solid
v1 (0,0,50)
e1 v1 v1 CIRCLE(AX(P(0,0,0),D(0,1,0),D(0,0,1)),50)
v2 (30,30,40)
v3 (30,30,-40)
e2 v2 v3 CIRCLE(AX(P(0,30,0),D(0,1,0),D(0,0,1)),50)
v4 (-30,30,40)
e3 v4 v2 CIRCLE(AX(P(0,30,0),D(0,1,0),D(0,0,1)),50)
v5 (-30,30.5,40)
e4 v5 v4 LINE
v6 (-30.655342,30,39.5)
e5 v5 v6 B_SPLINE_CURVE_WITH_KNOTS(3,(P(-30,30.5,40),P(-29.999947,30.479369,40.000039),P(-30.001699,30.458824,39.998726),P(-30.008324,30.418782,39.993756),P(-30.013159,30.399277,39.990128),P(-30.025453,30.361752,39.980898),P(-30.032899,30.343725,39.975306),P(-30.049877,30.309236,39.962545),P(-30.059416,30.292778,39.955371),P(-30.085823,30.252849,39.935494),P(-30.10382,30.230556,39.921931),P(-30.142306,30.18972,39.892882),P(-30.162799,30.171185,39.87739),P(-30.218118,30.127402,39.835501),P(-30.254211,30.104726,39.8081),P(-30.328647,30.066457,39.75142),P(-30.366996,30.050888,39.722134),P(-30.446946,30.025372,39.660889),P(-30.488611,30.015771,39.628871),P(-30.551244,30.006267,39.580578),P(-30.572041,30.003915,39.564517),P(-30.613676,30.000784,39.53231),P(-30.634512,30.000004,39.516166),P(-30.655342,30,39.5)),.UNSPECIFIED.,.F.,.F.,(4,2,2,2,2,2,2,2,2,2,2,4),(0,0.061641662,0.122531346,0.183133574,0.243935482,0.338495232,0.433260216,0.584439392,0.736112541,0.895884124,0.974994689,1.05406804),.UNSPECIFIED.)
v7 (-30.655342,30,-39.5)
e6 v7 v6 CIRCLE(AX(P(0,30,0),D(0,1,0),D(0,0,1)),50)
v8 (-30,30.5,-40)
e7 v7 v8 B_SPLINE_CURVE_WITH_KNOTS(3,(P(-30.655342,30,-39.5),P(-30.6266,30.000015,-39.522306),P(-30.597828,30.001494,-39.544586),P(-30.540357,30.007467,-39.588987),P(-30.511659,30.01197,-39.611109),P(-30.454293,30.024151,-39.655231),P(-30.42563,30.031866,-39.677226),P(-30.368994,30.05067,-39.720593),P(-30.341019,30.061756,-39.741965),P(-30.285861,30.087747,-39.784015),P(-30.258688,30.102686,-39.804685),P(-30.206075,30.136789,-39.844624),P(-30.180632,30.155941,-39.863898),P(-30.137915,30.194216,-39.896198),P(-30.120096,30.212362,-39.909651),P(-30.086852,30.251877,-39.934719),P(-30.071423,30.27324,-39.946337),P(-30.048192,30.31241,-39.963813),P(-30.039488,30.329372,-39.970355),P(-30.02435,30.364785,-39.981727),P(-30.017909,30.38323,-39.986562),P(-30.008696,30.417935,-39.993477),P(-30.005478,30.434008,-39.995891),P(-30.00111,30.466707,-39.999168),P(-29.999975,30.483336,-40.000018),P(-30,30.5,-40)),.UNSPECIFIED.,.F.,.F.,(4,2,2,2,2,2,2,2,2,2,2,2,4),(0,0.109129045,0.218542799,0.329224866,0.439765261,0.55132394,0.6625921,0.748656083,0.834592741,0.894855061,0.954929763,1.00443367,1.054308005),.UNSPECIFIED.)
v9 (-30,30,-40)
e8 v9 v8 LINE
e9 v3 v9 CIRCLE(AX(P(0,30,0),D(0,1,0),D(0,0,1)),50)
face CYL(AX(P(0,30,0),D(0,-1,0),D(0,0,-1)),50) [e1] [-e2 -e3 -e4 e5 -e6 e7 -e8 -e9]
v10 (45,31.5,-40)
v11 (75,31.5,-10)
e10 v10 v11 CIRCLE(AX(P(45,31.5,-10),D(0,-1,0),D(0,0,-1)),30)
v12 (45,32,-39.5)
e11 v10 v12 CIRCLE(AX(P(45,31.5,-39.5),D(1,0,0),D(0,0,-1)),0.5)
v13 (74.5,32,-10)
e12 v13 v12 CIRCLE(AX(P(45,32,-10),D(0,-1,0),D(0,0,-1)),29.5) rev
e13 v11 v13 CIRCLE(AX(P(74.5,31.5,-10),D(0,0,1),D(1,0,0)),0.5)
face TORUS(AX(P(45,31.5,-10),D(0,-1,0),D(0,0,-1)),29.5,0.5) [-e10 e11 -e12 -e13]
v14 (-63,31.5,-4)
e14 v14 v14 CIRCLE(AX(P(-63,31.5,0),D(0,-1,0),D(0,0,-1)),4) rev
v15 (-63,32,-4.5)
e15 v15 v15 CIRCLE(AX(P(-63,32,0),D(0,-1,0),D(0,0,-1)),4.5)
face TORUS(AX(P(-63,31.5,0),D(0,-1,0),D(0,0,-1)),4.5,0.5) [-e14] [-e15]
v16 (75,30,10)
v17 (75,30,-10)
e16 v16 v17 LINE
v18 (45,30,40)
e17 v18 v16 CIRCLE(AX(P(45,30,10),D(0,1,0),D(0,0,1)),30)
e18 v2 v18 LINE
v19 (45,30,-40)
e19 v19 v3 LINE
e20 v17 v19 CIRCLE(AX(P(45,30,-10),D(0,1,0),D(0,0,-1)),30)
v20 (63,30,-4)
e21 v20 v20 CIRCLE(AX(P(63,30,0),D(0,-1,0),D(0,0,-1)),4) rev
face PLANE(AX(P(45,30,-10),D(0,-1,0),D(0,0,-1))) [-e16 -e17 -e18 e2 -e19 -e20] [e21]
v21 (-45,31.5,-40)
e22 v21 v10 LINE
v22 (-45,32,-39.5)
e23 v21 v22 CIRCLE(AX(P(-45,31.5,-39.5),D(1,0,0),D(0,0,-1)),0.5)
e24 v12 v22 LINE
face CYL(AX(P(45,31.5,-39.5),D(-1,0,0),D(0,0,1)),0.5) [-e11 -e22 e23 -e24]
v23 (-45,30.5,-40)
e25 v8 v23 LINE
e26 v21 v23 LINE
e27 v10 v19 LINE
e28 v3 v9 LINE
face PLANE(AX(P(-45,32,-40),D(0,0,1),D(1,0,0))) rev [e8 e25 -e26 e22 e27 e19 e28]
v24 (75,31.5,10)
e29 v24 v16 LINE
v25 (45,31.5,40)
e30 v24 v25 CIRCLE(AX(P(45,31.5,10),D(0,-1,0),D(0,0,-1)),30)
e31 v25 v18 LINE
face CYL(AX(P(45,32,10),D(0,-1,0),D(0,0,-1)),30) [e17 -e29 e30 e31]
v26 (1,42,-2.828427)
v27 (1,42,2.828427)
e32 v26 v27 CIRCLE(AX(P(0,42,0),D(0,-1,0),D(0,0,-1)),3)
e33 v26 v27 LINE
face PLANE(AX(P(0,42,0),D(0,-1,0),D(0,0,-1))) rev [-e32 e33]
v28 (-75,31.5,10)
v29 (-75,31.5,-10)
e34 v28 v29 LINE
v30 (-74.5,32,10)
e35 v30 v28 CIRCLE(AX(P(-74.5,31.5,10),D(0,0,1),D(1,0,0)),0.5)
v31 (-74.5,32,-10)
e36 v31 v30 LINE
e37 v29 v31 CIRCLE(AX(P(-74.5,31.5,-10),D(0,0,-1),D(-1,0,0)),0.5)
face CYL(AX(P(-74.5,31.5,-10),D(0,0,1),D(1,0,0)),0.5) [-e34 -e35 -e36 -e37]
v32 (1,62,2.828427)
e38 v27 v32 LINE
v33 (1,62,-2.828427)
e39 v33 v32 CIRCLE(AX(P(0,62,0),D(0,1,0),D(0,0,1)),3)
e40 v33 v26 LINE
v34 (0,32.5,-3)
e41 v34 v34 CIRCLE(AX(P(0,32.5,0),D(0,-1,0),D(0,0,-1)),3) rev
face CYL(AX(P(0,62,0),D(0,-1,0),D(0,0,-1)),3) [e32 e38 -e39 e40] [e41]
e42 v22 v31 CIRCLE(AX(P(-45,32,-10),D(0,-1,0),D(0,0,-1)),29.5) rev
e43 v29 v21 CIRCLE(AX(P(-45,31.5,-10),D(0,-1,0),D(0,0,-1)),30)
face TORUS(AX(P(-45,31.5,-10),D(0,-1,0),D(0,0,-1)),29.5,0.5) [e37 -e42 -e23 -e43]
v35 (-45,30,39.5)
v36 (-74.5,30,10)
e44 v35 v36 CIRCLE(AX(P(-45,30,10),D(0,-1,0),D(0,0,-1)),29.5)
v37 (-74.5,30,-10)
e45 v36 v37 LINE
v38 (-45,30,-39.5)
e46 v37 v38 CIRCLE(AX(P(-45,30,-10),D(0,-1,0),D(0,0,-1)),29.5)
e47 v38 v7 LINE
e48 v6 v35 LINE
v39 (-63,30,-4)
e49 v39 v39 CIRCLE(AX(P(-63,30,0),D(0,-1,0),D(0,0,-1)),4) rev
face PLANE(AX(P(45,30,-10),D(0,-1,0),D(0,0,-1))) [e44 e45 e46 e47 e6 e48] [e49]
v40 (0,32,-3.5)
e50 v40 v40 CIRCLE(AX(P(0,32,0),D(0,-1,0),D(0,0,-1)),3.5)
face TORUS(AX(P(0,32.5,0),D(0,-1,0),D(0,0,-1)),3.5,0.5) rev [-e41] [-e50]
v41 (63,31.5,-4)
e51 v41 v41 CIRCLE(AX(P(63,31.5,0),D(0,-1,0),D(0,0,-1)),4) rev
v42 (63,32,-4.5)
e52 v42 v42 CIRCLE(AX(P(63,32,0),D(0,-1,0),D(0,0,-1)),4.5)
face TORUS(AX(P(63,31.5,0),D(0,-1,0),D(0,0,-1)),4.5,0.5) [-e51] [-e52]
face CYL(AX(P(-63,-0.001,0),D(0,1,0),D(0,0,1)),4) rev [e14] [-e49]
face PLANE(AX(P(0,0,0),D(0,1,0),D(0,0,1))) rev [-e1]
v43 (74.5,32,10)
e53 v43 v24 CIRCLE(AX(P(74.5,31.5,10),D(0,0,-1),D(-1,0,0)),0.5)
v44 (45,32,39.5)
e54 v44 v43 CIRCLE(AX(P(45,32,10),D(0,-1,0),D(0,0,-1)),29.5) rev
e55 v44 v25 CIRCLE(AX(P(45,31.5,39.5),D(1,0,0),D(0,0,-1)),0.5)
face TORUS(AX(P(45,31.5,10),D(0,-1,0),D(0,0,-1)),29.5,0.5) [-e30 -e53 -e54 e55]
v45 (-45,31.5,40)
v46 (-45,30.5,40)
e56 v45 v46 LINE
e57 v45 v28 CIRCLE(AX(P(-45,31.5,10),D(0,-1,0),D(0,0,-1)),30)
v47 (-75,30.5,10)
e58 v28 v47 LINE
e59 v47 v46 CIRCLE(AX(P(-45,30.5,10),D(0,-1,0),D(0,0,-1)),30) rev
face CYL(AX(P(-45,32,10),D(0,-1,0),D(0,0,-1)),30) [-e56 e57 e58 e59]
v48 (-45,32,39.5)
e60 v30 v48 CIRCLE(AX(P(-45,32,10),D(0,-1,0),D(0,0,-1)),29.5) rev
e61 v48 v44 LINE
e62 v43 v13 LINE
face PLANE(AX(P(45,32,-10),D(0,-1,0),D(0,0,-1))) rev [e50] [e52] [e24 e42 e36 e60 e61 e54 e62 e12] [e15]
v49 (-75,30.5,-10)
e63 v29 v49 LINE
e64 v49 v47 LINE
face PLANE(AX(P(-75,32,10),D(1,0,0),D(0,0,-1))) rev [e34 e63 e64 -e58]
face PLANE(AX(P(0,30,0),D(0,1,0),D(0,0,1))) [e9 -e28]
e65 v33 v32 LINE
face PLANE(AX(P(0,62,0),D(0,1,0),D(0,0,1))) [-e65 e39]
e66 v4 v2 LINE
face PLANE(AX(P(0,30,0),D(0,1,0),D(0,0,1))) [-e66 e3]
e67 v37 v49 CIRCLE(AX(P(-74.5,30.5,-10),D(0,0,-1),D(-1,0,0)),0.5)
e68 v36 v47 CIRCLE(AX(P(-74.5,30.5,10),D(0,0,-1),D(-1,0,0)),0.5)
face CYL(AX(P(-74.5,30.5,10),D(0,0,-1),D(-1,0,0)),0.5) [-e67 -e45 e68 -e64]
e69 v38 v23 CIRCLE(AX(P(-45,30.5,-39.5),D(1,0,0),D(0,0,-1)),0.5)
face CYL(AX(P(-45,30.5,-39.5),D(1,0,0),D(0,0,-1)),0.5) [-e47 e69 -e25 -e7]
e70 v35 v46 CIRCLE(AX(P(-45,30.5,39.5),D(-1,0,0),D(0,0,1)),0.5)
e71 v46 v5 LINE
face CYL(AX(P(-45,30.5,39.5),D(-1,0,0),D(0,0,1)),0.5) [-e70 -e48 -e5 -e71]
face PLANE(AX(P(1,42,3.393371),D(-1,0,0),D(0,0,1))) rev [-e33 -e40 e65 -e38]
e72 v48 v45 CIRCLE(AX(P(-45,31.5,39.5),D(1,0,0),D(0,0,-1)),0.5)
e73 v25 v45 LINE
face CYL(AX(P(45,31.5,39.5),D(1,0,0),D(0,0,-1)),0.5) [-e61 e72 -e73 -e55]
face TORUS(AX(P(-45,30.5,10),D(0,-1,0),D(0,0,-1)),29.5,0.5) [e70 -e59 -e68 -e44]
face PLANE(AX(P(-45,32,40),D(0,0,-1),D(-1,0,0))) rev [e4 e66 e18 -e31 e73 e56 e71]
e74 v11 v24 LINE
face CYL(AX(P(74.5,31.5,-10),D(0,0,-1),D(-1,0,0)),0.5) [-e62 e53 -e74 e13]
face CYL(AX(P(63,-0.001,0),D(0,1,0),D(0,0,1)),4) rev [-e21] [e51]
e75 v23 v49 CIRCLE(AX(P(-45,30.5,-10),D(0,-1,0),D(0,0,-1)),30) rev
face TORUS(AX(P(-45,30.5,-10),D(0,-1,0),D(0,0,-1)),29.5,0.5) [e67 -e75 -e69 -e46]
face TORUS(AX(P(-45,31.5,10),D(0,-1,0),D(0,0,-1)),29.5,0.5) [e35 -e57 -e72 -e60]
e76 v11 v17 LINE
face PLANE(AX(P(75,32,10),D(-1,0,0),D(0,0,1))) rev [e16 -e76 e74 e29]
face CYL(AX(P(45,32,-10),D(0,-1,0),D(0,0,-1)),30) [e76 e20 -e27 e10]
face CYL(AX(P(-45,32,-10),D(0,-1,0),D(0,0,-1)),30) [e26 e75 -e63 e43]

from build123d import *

# Parameters (mm, degrees)
ESBO_O1_R                = 50
RESSALTO_EXTRUS_O1_DEPTH = 30
RESSALTO_EXTRUS_O2_DEPTH = 2
ESBO_O3_R                = 3
RESSALTO_EXTRUS_O3_DEPTH = 30
ESBO_O4_W                = 2.913486889
ESBO_O4_H                = 6.765215319
CORTE_EXTRUS_O1_DEPTH    = 20
CORTE_EXTRUS_O2_REACH    = 97.65
ESBO_O6_R                = 4
FILETE2_R                = 0.5


with BuildPart() as part:
    # Esboço1 → Ressalto-extrusão1 (new body)
    with BuildSketch(Plane(origin=(0, 0, 0), x_dir=(1, 0, 0), z_dir=(0, 1, 0))):
        with Locations(Location((0, 0, 0), (0, 0, 270))):
            Circle(ESBO_O1_R)
    extrude(amount=RESSALTO_EXTRUS_O1_DEPTH)

    # Esboço2 → Ressalto-extrusão2 (add)
    with BuildSketch(Plane(origin=(0, 30, 0), x_dir=(1, 0, 0), z_dir=(0, 1, 0))):
        with BuildLine():
            Line((-45, -40), (45, -40))
            ThreePointArc((45, -40), (66.213203436, -31.213203436), (75, -10))
            Line((75, -10), (75, 10))
            ThreePointArc((75, 10), (66.213203436, 31.213203436), (45, 40))
            Line((45, 40), (-45, 40))
            ThreePointArc((-45, 40), (-66.213203436, 31.213203436), (-75, 10))
            Line((-75, 10), (-75, -10))
            ThreePointArc((-75, -10), (-66.213203436, -31.213203436), (-45, -40))
        make_face()
    extrude(amount=RESSALTO_EXTRUS_O2_DEPTH)

    # Esboço3 → Ressalto-extrusão3 (add)
    with BuildSketch(Plane(origin=(0, 32, 0), x_dir=(1, 0, 0), z_dir=(0, 1, 0))):
        with Locations(Location((0, 0, 0), (0, 0, 90))):
            Circle(ESBO_O3_R)
    extrude(amount=RESSALTO_EXTRUS_O3_DEPTH)

    # Esboço4 → Corte-extrusão1 (cut)
    with BuildSketch(Plane(origin=(0, 62, 0), x_dir=(1, 0, 0), z_dir=(0, 1, 0))):
        with Locations((2.456743444, -0.010763652)):
            Rectangle(ESBO_O4_W, ESBO_O4_H)
    extrude(amount=-CORTE_EXTRUS_O1_DEPTH, mode=Mode.SUBTRACT)

    # Esboço6 → Corte-extrusão2 (cut, up to next)
    with BuildSketch(Plane(origin=(0, 32, 0), x_dir=(1, 0, 0), z_dir=(0, 1, 0)), mode=Mode.PRIVATE) as corte_extrus_o2_sk1:
        with Locations(Location((-63, 0, 0), (0, 0, 270))):
            Circle(ESBO_O6_R)
    corte_extrus_o2_tool1 = extrude(corte_extrus_o2_sk1.sketch, amount=-CORTE_EXTRUS_O2_REACH, mode=Mode.PRIVATE) & part.part
    # Esboço6 → Corte-extrusão2 (cut, up to next)
    with BuildSketch(Plane(origin=(0, 32, 0), x_dir=(1, 0, 0), z_dir=(0, 1, 0)), mode=Mode.PRIVATE) as corte_extrus_o2_sk2:
        with Locations(Location((63, 0, 0), (0, 0, 90))):
            Circle(ESBO_O6_R)
    corte_extrus_o2_tool2 = extrude(corte_extrus_o2_sk2.sketch, amount=-CORTE_EXTRUS_O2_REACH, mode=Mode.PRIVATE) & part.part
    add(corte_extrus_o2_tool1.solids().sort_by_distance((-63, 32, 0))[0], mode=Mode.SUBTRACT)
    add(corte_extrus_o2_tool2.solids().sort_by_distance((63, 32, 0))[0], mode=Mode.SUBTRACT)

    # Filete2
    # the kernel refuses this fillet: 0.5 mm, written as the material it adds along each edge
    with BuildSketch(Plane(origin=(0, 32, 0), x_dir=(0, 0, -1), z_dir=(1, 0, 0))) as filete2_piece_1:
        with BuildLine():
            CenterArc((3 + FILETE2_R, FILETE2_R), FILETE2_R, 180, 90)
            Line((3, FILETE2_R), (3, 0))
            Line((3, 0), (3 + FILETE2_R, 0))
        make_face()
    revolve(axis=Axis((0, 32, 0), (0, 1, 0)))
    # the kernel refuses this fillet: 0.5 mm, written as the material it takes off along each edge
    with BuildSketch(Plane(origin=(-45, 30, 40), x_dir=(0, 0, -1), z_dir=(1, 0, 0))) as filete2_2_piece_1_section:
        with BuildLine():
            CenterArc((FILETE2_R, FILETE2_R), FILETE2_R, 180, 90)
            Line((0, FILETE2_R), (0, 0))
            Line((0, 0), (FILETE2_R, 0))
        make_face()
    filete2_2_piece_1 = extrude(amount=16.25, mode=Mode.PRIVATE)
    filete2_2_piece_1 = filete2_2_piece_1 - Plane(origin=(0, 30.083724815, 0), x_dir=(0, 0, 1), z_dir=(0, -1, 0)) * Cylinder(50, 35, mode=Mode.PRIVATE)
    add(filete2_2_piece_1, mode=Mode.SUBTRACT)
    with BuildSketch(Plane(origin=(45, 32, -10), x_dir=(1, 0, 0), z_dir=(0, 0, 1))) as filete2_2_piece_2:
        with BuildLine():
            CenterArc((30 - FILETE2_R, -FILETE2_R), FILETE2_R, 0, 90)
            Line((30 - FILETE2_R, 0), (30, 0))
            Line((30, 0), (30, -FILETE2_R))
        make_face()
    revolve(axis=Axis((45, 32, -10), (0, 1, 0)), revolution_arc=90, mode=Mode.SUBTRACT)
    with BuildSketch(Plane(origin=(45, 32, -40), x_dir=(0, -1, 0), z_dir=(-1, 0, 0)), Plane(origin=(-45, 32, 40), x_dir=(0, -1, 0), z_dir=(1, 0, 0))) as filete2_2_piece_3:
        with BuildLine():
            CenterArc((FILETE2_R, FILETE2_R), FILETE2_R, 180, 90)
            Line((0, FILETE2_R), (0, 0))
            Line((0, 0), (FILETE2_R, 0))
        make_face()
    extrude(amount=90, mode=Mode.SUBTRACT)
    with BuildSketch(Plane(origin=(-45, 32, -10), x_dir=(0, 0, -1), z_dir=(1, 0, 0))) as filete2_2_piece_4:
        with BuildLine():
            CenterArc((30 - FILETE2_R, -FILETE2_R), FILETE2_R, 0, 90)
            Line((30 - FILETE2_R, 0), (30, 0))
            Line((30, 0), (30, -FILETE2_R))
        make_face()
    revolve(axis=Axis((-45, 32, -10), (0, 1, 0)), revolution_arc=90, mode=Mode.SUBTRACT)
    with BuildSketch(Plane(origin=(-75, 32, -10), x_dir=(0, -1, 0), z_dir=(0, 0, 1)), Plane(origin=(75, 32, 10), x_dir=(0, -1, 0), z_dir=(0, 0, -1)), Plane(origin=(-75, 30, -10), x_dir=(1, 0, 0), z_dir=(0, 0, 1))) as filete2_2_piece_5:
        with BuildLine():
            CenterArc((FILETE2_R, FILETE2_R), FILETE2_R, 180, 90)
            Line((0, FILETE2_R), (0, 0))
            Line((0, 0), (FILETE2_R, 0))
        make_face()
    extrude(amount=20, mode=Mode.SUBTRACT)
    with BuildSketch(Plane(origin=(-45, 32, 10), x_dir=(-1, 0, 0), z_dir=(0, 0, -1))) as filete2_2_piece_6:
        with BuildLine():
            CenterArc((30 - FILETE2_R, -FILETE2_R), FILETE2_R, 0, 90)
            Line((30 - FILETE2_R, 0), (30, 0))
            Line((30, 0), (30, -FILETE2_R))
        make_face()
    revolve(axis=Axis((-45, 32, 10), (0, 1, 0)), revolution_arc=90, mode=Mode.SUBTRACT)
    with BuildSketch(Plane(origin=(45, 32, 10), x_dir=(0, 0, 1), z_dir=(-1, 0, 0))) as filete2_2_piece_7:
        with BuildLine():
            CenterArc((30 - FILETE2_R, -FILETE2_R), FILETE2_R, 0, 90)
            Line((30 - FILETE2_R, 0), (30, 0))
            Line((30, 0), (30, -FILETE2_R))
        make_face()
    revolve(axis=Axis((45, 32, 10), (0, 1, 0)), revolution_arc=90, mode=Mode.SUBTRACT)
    with BuildSketch(Plane(origin=(-63, 32, 0), x_dir=(0, 0, 1), z_dir=(-1, 0, 0))) as filete2_2_piece_8:
        with BuildLine():
            CenterArc((4 + FILETE2_R, -FILETE2_R), FILETE2_R, 90, 90)
            Line((4 + FILETE2_R, 0), (4, 0))
            Line((4, 0), (4, -FILETE2_R))
        make_face()
    revolve(axis=Axis((-63, 32, 0), (0, 1, 0)), mode=Mode.SUBTRACT)
    with BuildSketch(Plane(origin=(63, 32, 0), x_dir=(0, 0, -1), z_dir=(1, 0, 0))) as filete2_2_piece_9:
        with BuildLine():
            CenterArc((4 + FILETE2_R, -FILETE2_R), FILETE2_R, 90, 90)
            Line((4 + FILETE2_R, 0), (4, 0))
            Line((4, 0), (4, -FILETE2_R))
        make_face()
    revolve(axis=Axis((63, 32, 0), (0, 1, 0)), mode=Mode.SUBTRACT)
    with BuildSketch(Plane(origin=(-28.75, 30, -40), x_dir=(0, 0, 1), z_dir=(-1, 0, 0))) as filete2_2_piece_10_section:
        with BuildLine():
            CenterArc((FILETE2_R, FILETE2_R), FILETE2_R, 180, 90)
            Line((0, FILETE2_R), (0, 0))
            Line((0, 0), (FILETE2_R, 0))
        make_face()
    filete2_2_piece_10 = extrude(amount=16.25, mode=Mode.PRIVATE)
    filete2_2_piece_10 = filete2_2_piece_10 - Plane(origin=(0, 30.117437767, 0), x_dir=(0, 0, 1), z_dir=(0, -1, 0)) * Cylinder(50, 35, mode=Mode.PRIVATE)
    add(filete2_2_piece_10, mode=Mode.SUBTRACT)
    with BuildSketch(Plane(origin=(-45, 30, -10), x_dir=(0, 0, -1), z_dir=(1, 0, 0))) as filete2_2_piece_11:
        with BuildLine():
            CenterArc((30 - FILETE2_R, FILETE2_R), FILETE2_R, 270, 90)
            Line((30, FILETE2_R), (30, 0))
            Line((30, 0), (30 - FILETE2_R, 0))
        make_face()
    revolve(axis=Axis((-45, 30, -10), (0, 1, 0)), revolution_arc=90, mode=Mode.SUBTRACT)
    with BuildSketch(Plane(origin=(-45, 30, 10), x_dir=(-1, 0, 0), z_dir=(0, 0, -1))) as filete2_2_piece_12:
        with BuildLine():
            CenterArc((30 - FILETE2_R, FILETE2_R), FILETE2_R, 270, 90)
            Line((30, FILETE2_R), (30, 0))
            Line((30, 0), (30 - FILETE2_R, 0))
        make_face()
    revolve(axis=Axis((-45, 30, 10), (0, 1, 0)), revolution_arc=90, mode=Mode.SUBTRACT)


solid = part.part
